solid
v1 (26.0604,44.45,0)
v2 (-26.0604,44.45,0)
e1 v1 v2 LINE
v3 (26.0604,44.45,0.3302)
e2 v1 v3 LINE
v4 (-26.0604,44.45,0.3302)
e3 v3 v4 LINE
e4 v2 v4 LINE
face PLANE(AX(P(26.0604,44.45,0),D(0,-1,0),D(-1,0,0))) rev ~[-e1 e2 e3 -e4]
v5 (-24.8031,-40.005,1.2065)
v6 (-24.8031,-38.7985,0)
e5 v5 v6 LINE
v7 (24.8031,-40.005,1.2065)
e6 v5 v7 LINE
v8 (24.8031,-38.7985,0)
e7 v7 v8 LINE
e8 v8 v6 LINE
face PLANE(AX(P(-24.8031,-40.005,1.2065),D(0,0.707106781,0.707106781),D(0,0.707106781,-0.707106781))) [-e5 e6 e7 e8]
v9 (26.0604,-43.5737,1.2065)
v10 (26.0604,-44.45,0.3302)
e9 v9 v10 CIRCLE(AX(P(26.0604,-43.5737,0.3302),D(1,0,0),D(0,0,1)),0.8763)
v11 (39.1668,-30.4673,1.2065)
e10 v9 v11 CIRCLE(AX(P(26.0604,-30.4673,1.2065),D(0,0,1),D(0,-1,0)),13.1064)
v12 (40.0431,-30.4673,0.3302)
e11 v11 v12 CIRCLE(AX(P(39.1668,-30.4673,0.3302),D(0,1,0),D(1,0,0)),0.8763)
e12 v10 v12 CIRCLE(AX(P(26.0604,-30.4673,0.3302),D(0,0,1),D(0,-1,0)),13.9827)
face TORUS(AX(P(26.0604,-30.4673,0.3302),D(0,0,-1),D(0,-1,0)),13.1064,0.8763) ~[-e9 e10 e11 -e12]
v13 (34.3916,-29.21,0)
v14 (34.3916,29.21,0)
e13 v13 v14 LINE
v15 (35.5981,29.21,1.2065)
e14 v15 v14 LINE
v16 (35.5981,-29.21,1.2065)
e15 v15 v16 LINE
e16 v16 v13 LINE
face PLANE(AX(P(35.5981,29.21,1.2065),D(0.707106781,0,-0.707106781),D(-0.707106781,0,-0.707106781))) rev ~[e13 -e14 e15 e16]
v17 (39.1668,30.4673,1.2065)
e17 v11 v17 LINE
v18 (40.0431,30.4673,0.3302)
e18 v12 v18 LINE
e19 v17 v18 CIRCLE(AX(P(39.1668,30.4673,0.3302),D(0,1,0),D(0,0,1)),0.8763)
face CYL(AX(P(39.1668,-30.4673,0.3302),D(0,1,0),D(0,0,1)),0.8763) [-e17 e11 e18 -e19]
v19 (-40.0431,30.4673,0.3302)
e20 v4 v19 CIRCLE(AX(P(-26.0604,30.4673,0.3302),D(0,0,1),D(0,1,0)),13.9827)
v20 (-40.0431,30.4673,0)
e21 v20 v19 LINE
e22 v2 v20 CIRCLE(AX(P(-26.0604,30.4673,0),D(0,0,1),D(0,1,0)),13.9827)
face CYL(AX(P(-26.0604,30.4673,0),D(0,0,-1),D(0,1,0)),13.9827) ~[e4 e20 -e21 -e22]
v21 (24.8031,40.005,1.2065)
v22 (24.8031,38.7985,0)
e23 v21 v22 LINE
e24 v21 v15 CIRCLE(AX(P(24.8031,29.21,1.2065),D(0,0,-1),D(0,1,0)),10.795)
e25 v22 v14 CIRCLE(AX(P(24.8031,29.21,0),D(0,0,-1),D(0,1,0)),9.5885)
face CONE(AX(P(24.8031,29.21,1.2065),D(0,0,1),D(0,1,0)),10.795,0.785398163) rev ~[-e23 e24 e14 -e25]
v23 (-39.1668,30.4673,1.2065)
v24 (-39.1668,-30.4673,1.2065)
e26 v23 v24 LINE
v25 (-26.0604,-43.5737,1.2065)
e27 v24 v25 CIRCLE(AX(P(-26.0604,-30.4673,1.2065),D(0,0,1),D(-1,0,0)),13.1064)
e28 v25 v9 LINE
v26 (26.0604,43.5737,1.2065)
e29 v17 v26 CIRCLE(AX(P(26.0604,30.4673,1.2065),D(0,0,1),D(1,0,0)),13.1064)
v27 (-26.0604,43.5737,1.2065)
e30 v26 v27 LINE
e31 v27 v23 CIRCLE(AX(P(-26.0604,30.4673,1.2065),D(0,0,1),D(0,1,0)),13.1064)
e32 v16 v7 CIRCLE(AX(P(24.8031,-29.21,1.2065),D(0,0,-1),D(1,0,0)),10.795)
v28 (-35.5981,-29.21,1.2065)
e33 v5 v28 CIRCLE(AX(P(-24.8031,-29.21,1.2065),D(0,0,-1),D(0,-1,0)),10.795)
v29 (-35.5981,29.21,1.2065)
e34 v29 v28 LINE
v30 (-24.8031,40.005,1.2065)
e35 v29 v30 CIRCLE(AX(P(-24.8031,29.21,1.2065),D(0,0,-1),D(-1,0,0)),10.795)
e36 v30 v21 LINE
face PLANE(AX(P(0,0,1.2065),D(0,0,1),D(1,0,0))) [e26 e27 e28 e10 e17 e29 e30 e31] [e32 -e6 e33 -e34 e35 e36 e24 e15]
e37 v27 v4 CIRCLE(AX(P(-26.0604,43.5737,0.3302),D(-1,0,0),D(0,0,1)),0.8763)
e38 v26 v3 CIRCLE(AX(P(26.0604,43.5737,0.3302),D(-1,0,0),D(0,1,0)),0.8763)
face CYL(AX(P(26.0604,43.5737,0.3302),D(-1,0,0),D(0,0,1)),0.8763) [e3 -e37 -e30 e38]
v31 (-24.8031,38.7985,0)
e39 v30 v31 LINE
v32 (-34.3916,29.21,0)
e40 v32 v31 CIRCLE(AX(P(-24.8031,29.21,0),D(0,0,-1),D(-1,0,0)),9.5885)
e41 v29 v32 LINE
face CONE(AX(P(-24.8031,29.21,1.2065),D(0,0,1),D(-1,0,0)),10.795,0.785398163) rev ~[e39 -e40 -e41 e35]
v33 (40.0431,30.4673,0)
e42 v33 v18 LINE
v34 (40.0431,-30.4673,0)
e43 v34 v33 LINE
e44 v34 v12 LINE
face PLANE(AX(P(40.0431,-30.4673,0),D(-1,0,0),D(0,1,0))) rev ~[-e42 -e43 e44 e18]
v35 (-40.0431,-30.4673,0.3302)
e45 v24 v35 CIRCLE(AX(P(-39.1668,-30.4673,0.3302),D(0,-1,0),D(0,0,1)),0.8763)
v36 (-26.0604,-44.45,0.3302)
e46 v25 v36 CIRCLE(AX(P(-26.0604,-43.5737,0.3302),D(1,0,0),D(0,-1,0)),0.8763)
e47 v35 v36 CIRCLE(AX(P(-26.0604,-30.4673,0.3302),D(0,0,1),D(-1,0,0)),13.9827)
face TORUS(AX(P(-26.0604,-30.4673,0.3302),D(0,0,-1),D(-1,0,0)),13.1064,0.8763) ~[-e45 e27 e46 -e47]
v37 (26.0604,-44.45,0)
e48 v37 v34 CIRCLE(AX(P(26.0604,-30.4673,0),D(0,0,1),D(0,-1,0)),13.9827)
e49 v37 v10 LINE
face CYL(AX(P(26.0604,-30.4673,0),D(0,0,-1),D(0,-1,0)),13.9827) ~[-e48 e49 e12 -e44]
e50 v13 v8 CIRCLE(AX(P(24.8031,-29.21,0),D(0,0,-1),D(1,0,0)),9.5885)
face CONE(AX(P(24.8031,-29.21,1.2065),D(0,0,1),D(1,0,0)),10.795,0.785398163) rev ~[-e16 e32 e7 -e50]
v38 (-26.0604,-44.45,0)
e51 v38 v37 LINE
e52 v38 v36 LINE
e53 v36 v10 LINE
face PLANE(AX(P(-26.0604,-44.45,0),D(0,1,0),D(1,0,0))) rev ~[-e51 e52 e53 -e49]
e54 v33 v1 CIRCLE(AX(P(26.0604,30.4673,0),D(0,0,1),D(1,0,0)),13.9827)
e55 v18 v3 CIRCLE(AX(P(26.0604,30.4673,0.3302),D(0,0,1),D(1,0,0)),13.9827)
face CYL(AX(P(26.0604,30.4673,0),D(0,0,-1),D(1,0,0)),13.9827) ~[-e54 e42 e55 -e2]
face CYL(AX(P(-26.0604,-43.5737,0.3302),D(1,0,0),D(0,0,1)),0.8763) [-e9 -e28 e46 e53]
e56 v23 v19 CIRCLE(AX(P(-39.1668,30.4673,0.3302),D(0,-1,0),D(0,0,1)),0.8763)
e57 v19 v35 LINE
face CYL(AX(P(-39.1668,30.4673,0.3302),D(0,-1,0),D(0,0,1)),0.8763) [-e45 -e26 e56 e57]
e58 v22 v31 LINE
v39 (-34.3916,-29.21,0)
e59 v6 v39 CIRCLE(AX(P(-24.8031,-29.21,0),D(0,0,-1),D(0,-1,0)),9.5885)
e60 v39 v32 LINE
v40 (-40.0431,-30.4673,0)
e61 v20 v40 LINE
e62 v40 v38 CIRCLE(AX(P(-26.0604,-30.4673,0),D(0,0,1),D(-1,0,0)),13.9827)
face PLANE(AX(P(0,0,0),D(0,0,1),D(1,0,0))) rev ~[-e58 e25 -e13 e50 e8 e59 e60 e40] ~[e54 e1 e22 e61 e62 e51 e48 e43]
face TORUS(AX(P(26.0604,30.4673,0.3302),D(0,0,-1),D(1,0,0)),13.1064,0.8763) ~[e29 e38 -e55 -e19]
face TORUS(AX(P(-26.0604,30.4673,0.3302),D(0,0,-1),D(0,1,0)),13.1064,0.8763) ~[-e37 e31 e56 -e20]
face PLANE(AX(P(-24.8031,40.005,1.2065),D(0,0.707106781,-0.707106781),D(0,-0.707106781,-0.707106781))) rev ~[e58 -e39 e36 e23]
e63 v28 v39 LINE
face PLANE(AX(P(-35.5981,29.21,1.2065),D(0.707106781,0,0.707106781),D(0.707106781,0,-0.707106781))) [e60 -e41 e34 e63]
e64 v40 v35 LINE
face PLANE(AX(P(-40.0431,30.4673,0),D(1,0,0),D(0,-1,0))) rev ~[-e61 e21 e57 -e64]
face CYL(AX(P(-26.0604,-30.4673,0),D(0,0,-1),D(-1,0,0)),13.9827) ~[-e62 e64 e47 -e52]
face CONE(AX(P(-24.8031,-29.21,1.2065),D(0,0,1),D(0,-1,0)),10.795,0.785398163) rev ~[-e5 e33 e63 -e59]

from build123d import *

# Parameters (mm, degrees)
F2_DEPTH     = 1.2065
F3_DEPTH     = 1.2075
F4_R         = 0.8763
F5_T1_DEPTH  = 58.42
F5_T3_DEPTH  = 49.6062
F5_T6_ANGLE  = 90
F5_T8_ANGLE  = 90
F5_T10_ANGLE = 90
F5_T12_ANGLE = 90


# Not quite as in the source:
# - a fillet or chamfer that OpenCascade refuses, or shapes differently, is made with other operations: its cross-section is extruded or revolved along the edge and cut away or added


with BuildPart() as f2:
    # F0 (on Top) → F2 (new body)
    with BuildSketch(Plane.XY):
        with BuildLine():
            ThreePointArc((40.0431, 30.4673), (35.9476619893, 40.3545619893), (26.0604, 44.45))
            Line((26.0604, 44.45), (-26.0604, 44.45))
            ThreePointArc((-26.0604, 44.45), (-35.9476619893, 40.3545619893), (-40.0431, 30.4673))
            Line((-40.0431, 30.4673), (-40.0431, -30.4673))
            ThreePointArc((-40.0431, -30.4673), (-35.9476619893, -40.3545619893), (-26.0604, -44.45))
            Line((-26.0604, -44.45), (26.0604, -44.45))
            ThreePointArc((26.0604, -44.45), (35.9476619893, -40.3545619893), (40.0431, -30.4673))
            Line((40.0431, -30.4673), (40.0431, 30.4673))
        make_face()
    extrude(amount=F2_DEPTH)

    # F1 (on Top) + F2_face (on face) → F3 (cut, through all)
    with BuildSketch(Plane.XY):
        with BuildLine():
            ThreePointArc((34.3281, 29.21), (31.5382920908, 35.9451920908), (24.8031, 38.735))
            Line((24.8031, 38.735), (-24.8031, 38.735))
            ThreePointArc((-24.8031, 38.735), (-31.5382920908, 35.9451920908), (-34.3281, 29.21))
            Line((-34.3281, 29.21), (-34.3281, -29.21))
            ThreePointArc((-34.3281, -29.21), (-31.5382920908, -35.9451920908), (-24.8031, -38.735))
            Line((-24.8031, -38.735), (24.8031, -38.735))
            ThreePointArc((24.8031, -38.735), (31.5382920908, -35.9451920908), (34.3281, -29.21))
            Line((34.3281, -29.21), (34.3281, 29.21))
        make_face()
    with BuildSketch(Plane.XY.offset(1.2065)):
        with BuildLine():
            ThreePointArc((40.0431, 30.4673), (35.9476619893, 40.3545619893), (26.0604, 44.45))
            Line((26.0604, 44.45), (-26.0604, 44.45))
            ThreePointArc((-26.0604, 44.45), (-35.9476619893, 40.3545619893), (-40.0431, 30.4673))
            Line((-40.0431, 30.4673), (-40.0431, -30.4673))
            ThreePointArc((-40.0431, -30.4673), (-35.9476619893, -40.3545619893), (-26.0604, -44.45))
            Line((-26.0604, -44.45), (26.0604, -44.45))
            ThreePointArc((26.0604, -44.45), (35.9476619893, -40.3545619893), (40.0431, -30.4673))
            Line((40.0431, -30.4673), (40.0431, 30.4673))
        make_face()
    extrude(amount=F3_DEPTH, mode=Mode.SUBTRACT)

    # F4
    f4_edges = [f2.edges().sort_by_distance(p)[0] for p in [
        (-40.0431, 0, 1.2065),
    ]]
    fillet(f4_edges, radius=F4_R)

    # F5: chamfer of 1.27 on 1 edges, made by hand

    # F5_s2 → F5_t1 (cut)
    with BuildSketch(Plane.XZ.offset(-29.21)):
        Polygon((-35.5981, 1.2065), (-34.3281, -0.0635), (-34.3281, 1.2065), align=None)
        Polygon((35.5981, 1.2065), (34.3281, -0.0635), (34.3281, 1.2065), align=None)
    extrude(amount=F5_T1_DEPTH, mode=Mode.SUBTRACT)

    # F5_s4 → F5_t3 (cut)
    with BuildSketch(Plane.YZ.offset(-24.8031)):
        Polygon((-40.005, 1.2065), (-38.735, -0.0635), (-38.735, 1.2065), align=None)
        Polygon((40.005, 1.2065), (38.735, -0.0635), (38.735, 1.2065), align=None)
    extrude(amount=F5_T3_DEPTH, mode=Mode.SUBTRACT)

    # F5_s5 → F5_t6 (revolve, cut)
    with BuildSketch(Plane.XZ.offset(-29.21)):
        Polygon((-35.5981, 1.2065), (-34.3281, -0.0635), (-34.3281, 1.2065), align=None)
    revolve(axis=Axis((-24.8031, 29.21, 1.2065), (0, 0, -1)), revolution_arc=F5_T6_ANGLE, mode=Mode.SUBTRACT)

    # F5_s7 → F5_t8 (revolve, cut)
    with BuildSketch(Plane.YZ.offset(-24.8031)):
        Polygon((-40.005, 1.2065), (-38.735, -0.0635), (-38.735, 1.2065), align=None)
    revolve(axis=Axis((-24.8031, -29.21, 1.2065), (0, 0, -1)), revolution_arc=F5_T8_ANGLE, mode=Mode.SUBTRACT)

    # F5_s9 → F5_t10 (revolve, cut)
    with BuildSketch(Plane.XZ.offset(29.21)):
        Polygon((35.5981, 1.2065), (34.3281, -0.0635), (34.3281, 1.2065), align=None)
    revolve(axis=Axis((24.8031, -29.21, 1.2065), (0, 0, -1)), revolution_arc=F5_T10_ANGLE, mode=Mode.SUBTRACT)

    # F5_s11 → F5_t12 (revolve, cut)
    with BuildSketch(Plane.YZ.offset(24.8031)):
        Polygon((40.005, 1.2065), (38.735, -0.0635), (38.735, 1.2065), align=None)
    revolve(axis=Axis((24.8031, 29.21, 1.2065), (0, 0, -1)), revolution_arc=F5_T12_ANGLE, mode=Mode.SUBTRACT)


solid = f2.part
